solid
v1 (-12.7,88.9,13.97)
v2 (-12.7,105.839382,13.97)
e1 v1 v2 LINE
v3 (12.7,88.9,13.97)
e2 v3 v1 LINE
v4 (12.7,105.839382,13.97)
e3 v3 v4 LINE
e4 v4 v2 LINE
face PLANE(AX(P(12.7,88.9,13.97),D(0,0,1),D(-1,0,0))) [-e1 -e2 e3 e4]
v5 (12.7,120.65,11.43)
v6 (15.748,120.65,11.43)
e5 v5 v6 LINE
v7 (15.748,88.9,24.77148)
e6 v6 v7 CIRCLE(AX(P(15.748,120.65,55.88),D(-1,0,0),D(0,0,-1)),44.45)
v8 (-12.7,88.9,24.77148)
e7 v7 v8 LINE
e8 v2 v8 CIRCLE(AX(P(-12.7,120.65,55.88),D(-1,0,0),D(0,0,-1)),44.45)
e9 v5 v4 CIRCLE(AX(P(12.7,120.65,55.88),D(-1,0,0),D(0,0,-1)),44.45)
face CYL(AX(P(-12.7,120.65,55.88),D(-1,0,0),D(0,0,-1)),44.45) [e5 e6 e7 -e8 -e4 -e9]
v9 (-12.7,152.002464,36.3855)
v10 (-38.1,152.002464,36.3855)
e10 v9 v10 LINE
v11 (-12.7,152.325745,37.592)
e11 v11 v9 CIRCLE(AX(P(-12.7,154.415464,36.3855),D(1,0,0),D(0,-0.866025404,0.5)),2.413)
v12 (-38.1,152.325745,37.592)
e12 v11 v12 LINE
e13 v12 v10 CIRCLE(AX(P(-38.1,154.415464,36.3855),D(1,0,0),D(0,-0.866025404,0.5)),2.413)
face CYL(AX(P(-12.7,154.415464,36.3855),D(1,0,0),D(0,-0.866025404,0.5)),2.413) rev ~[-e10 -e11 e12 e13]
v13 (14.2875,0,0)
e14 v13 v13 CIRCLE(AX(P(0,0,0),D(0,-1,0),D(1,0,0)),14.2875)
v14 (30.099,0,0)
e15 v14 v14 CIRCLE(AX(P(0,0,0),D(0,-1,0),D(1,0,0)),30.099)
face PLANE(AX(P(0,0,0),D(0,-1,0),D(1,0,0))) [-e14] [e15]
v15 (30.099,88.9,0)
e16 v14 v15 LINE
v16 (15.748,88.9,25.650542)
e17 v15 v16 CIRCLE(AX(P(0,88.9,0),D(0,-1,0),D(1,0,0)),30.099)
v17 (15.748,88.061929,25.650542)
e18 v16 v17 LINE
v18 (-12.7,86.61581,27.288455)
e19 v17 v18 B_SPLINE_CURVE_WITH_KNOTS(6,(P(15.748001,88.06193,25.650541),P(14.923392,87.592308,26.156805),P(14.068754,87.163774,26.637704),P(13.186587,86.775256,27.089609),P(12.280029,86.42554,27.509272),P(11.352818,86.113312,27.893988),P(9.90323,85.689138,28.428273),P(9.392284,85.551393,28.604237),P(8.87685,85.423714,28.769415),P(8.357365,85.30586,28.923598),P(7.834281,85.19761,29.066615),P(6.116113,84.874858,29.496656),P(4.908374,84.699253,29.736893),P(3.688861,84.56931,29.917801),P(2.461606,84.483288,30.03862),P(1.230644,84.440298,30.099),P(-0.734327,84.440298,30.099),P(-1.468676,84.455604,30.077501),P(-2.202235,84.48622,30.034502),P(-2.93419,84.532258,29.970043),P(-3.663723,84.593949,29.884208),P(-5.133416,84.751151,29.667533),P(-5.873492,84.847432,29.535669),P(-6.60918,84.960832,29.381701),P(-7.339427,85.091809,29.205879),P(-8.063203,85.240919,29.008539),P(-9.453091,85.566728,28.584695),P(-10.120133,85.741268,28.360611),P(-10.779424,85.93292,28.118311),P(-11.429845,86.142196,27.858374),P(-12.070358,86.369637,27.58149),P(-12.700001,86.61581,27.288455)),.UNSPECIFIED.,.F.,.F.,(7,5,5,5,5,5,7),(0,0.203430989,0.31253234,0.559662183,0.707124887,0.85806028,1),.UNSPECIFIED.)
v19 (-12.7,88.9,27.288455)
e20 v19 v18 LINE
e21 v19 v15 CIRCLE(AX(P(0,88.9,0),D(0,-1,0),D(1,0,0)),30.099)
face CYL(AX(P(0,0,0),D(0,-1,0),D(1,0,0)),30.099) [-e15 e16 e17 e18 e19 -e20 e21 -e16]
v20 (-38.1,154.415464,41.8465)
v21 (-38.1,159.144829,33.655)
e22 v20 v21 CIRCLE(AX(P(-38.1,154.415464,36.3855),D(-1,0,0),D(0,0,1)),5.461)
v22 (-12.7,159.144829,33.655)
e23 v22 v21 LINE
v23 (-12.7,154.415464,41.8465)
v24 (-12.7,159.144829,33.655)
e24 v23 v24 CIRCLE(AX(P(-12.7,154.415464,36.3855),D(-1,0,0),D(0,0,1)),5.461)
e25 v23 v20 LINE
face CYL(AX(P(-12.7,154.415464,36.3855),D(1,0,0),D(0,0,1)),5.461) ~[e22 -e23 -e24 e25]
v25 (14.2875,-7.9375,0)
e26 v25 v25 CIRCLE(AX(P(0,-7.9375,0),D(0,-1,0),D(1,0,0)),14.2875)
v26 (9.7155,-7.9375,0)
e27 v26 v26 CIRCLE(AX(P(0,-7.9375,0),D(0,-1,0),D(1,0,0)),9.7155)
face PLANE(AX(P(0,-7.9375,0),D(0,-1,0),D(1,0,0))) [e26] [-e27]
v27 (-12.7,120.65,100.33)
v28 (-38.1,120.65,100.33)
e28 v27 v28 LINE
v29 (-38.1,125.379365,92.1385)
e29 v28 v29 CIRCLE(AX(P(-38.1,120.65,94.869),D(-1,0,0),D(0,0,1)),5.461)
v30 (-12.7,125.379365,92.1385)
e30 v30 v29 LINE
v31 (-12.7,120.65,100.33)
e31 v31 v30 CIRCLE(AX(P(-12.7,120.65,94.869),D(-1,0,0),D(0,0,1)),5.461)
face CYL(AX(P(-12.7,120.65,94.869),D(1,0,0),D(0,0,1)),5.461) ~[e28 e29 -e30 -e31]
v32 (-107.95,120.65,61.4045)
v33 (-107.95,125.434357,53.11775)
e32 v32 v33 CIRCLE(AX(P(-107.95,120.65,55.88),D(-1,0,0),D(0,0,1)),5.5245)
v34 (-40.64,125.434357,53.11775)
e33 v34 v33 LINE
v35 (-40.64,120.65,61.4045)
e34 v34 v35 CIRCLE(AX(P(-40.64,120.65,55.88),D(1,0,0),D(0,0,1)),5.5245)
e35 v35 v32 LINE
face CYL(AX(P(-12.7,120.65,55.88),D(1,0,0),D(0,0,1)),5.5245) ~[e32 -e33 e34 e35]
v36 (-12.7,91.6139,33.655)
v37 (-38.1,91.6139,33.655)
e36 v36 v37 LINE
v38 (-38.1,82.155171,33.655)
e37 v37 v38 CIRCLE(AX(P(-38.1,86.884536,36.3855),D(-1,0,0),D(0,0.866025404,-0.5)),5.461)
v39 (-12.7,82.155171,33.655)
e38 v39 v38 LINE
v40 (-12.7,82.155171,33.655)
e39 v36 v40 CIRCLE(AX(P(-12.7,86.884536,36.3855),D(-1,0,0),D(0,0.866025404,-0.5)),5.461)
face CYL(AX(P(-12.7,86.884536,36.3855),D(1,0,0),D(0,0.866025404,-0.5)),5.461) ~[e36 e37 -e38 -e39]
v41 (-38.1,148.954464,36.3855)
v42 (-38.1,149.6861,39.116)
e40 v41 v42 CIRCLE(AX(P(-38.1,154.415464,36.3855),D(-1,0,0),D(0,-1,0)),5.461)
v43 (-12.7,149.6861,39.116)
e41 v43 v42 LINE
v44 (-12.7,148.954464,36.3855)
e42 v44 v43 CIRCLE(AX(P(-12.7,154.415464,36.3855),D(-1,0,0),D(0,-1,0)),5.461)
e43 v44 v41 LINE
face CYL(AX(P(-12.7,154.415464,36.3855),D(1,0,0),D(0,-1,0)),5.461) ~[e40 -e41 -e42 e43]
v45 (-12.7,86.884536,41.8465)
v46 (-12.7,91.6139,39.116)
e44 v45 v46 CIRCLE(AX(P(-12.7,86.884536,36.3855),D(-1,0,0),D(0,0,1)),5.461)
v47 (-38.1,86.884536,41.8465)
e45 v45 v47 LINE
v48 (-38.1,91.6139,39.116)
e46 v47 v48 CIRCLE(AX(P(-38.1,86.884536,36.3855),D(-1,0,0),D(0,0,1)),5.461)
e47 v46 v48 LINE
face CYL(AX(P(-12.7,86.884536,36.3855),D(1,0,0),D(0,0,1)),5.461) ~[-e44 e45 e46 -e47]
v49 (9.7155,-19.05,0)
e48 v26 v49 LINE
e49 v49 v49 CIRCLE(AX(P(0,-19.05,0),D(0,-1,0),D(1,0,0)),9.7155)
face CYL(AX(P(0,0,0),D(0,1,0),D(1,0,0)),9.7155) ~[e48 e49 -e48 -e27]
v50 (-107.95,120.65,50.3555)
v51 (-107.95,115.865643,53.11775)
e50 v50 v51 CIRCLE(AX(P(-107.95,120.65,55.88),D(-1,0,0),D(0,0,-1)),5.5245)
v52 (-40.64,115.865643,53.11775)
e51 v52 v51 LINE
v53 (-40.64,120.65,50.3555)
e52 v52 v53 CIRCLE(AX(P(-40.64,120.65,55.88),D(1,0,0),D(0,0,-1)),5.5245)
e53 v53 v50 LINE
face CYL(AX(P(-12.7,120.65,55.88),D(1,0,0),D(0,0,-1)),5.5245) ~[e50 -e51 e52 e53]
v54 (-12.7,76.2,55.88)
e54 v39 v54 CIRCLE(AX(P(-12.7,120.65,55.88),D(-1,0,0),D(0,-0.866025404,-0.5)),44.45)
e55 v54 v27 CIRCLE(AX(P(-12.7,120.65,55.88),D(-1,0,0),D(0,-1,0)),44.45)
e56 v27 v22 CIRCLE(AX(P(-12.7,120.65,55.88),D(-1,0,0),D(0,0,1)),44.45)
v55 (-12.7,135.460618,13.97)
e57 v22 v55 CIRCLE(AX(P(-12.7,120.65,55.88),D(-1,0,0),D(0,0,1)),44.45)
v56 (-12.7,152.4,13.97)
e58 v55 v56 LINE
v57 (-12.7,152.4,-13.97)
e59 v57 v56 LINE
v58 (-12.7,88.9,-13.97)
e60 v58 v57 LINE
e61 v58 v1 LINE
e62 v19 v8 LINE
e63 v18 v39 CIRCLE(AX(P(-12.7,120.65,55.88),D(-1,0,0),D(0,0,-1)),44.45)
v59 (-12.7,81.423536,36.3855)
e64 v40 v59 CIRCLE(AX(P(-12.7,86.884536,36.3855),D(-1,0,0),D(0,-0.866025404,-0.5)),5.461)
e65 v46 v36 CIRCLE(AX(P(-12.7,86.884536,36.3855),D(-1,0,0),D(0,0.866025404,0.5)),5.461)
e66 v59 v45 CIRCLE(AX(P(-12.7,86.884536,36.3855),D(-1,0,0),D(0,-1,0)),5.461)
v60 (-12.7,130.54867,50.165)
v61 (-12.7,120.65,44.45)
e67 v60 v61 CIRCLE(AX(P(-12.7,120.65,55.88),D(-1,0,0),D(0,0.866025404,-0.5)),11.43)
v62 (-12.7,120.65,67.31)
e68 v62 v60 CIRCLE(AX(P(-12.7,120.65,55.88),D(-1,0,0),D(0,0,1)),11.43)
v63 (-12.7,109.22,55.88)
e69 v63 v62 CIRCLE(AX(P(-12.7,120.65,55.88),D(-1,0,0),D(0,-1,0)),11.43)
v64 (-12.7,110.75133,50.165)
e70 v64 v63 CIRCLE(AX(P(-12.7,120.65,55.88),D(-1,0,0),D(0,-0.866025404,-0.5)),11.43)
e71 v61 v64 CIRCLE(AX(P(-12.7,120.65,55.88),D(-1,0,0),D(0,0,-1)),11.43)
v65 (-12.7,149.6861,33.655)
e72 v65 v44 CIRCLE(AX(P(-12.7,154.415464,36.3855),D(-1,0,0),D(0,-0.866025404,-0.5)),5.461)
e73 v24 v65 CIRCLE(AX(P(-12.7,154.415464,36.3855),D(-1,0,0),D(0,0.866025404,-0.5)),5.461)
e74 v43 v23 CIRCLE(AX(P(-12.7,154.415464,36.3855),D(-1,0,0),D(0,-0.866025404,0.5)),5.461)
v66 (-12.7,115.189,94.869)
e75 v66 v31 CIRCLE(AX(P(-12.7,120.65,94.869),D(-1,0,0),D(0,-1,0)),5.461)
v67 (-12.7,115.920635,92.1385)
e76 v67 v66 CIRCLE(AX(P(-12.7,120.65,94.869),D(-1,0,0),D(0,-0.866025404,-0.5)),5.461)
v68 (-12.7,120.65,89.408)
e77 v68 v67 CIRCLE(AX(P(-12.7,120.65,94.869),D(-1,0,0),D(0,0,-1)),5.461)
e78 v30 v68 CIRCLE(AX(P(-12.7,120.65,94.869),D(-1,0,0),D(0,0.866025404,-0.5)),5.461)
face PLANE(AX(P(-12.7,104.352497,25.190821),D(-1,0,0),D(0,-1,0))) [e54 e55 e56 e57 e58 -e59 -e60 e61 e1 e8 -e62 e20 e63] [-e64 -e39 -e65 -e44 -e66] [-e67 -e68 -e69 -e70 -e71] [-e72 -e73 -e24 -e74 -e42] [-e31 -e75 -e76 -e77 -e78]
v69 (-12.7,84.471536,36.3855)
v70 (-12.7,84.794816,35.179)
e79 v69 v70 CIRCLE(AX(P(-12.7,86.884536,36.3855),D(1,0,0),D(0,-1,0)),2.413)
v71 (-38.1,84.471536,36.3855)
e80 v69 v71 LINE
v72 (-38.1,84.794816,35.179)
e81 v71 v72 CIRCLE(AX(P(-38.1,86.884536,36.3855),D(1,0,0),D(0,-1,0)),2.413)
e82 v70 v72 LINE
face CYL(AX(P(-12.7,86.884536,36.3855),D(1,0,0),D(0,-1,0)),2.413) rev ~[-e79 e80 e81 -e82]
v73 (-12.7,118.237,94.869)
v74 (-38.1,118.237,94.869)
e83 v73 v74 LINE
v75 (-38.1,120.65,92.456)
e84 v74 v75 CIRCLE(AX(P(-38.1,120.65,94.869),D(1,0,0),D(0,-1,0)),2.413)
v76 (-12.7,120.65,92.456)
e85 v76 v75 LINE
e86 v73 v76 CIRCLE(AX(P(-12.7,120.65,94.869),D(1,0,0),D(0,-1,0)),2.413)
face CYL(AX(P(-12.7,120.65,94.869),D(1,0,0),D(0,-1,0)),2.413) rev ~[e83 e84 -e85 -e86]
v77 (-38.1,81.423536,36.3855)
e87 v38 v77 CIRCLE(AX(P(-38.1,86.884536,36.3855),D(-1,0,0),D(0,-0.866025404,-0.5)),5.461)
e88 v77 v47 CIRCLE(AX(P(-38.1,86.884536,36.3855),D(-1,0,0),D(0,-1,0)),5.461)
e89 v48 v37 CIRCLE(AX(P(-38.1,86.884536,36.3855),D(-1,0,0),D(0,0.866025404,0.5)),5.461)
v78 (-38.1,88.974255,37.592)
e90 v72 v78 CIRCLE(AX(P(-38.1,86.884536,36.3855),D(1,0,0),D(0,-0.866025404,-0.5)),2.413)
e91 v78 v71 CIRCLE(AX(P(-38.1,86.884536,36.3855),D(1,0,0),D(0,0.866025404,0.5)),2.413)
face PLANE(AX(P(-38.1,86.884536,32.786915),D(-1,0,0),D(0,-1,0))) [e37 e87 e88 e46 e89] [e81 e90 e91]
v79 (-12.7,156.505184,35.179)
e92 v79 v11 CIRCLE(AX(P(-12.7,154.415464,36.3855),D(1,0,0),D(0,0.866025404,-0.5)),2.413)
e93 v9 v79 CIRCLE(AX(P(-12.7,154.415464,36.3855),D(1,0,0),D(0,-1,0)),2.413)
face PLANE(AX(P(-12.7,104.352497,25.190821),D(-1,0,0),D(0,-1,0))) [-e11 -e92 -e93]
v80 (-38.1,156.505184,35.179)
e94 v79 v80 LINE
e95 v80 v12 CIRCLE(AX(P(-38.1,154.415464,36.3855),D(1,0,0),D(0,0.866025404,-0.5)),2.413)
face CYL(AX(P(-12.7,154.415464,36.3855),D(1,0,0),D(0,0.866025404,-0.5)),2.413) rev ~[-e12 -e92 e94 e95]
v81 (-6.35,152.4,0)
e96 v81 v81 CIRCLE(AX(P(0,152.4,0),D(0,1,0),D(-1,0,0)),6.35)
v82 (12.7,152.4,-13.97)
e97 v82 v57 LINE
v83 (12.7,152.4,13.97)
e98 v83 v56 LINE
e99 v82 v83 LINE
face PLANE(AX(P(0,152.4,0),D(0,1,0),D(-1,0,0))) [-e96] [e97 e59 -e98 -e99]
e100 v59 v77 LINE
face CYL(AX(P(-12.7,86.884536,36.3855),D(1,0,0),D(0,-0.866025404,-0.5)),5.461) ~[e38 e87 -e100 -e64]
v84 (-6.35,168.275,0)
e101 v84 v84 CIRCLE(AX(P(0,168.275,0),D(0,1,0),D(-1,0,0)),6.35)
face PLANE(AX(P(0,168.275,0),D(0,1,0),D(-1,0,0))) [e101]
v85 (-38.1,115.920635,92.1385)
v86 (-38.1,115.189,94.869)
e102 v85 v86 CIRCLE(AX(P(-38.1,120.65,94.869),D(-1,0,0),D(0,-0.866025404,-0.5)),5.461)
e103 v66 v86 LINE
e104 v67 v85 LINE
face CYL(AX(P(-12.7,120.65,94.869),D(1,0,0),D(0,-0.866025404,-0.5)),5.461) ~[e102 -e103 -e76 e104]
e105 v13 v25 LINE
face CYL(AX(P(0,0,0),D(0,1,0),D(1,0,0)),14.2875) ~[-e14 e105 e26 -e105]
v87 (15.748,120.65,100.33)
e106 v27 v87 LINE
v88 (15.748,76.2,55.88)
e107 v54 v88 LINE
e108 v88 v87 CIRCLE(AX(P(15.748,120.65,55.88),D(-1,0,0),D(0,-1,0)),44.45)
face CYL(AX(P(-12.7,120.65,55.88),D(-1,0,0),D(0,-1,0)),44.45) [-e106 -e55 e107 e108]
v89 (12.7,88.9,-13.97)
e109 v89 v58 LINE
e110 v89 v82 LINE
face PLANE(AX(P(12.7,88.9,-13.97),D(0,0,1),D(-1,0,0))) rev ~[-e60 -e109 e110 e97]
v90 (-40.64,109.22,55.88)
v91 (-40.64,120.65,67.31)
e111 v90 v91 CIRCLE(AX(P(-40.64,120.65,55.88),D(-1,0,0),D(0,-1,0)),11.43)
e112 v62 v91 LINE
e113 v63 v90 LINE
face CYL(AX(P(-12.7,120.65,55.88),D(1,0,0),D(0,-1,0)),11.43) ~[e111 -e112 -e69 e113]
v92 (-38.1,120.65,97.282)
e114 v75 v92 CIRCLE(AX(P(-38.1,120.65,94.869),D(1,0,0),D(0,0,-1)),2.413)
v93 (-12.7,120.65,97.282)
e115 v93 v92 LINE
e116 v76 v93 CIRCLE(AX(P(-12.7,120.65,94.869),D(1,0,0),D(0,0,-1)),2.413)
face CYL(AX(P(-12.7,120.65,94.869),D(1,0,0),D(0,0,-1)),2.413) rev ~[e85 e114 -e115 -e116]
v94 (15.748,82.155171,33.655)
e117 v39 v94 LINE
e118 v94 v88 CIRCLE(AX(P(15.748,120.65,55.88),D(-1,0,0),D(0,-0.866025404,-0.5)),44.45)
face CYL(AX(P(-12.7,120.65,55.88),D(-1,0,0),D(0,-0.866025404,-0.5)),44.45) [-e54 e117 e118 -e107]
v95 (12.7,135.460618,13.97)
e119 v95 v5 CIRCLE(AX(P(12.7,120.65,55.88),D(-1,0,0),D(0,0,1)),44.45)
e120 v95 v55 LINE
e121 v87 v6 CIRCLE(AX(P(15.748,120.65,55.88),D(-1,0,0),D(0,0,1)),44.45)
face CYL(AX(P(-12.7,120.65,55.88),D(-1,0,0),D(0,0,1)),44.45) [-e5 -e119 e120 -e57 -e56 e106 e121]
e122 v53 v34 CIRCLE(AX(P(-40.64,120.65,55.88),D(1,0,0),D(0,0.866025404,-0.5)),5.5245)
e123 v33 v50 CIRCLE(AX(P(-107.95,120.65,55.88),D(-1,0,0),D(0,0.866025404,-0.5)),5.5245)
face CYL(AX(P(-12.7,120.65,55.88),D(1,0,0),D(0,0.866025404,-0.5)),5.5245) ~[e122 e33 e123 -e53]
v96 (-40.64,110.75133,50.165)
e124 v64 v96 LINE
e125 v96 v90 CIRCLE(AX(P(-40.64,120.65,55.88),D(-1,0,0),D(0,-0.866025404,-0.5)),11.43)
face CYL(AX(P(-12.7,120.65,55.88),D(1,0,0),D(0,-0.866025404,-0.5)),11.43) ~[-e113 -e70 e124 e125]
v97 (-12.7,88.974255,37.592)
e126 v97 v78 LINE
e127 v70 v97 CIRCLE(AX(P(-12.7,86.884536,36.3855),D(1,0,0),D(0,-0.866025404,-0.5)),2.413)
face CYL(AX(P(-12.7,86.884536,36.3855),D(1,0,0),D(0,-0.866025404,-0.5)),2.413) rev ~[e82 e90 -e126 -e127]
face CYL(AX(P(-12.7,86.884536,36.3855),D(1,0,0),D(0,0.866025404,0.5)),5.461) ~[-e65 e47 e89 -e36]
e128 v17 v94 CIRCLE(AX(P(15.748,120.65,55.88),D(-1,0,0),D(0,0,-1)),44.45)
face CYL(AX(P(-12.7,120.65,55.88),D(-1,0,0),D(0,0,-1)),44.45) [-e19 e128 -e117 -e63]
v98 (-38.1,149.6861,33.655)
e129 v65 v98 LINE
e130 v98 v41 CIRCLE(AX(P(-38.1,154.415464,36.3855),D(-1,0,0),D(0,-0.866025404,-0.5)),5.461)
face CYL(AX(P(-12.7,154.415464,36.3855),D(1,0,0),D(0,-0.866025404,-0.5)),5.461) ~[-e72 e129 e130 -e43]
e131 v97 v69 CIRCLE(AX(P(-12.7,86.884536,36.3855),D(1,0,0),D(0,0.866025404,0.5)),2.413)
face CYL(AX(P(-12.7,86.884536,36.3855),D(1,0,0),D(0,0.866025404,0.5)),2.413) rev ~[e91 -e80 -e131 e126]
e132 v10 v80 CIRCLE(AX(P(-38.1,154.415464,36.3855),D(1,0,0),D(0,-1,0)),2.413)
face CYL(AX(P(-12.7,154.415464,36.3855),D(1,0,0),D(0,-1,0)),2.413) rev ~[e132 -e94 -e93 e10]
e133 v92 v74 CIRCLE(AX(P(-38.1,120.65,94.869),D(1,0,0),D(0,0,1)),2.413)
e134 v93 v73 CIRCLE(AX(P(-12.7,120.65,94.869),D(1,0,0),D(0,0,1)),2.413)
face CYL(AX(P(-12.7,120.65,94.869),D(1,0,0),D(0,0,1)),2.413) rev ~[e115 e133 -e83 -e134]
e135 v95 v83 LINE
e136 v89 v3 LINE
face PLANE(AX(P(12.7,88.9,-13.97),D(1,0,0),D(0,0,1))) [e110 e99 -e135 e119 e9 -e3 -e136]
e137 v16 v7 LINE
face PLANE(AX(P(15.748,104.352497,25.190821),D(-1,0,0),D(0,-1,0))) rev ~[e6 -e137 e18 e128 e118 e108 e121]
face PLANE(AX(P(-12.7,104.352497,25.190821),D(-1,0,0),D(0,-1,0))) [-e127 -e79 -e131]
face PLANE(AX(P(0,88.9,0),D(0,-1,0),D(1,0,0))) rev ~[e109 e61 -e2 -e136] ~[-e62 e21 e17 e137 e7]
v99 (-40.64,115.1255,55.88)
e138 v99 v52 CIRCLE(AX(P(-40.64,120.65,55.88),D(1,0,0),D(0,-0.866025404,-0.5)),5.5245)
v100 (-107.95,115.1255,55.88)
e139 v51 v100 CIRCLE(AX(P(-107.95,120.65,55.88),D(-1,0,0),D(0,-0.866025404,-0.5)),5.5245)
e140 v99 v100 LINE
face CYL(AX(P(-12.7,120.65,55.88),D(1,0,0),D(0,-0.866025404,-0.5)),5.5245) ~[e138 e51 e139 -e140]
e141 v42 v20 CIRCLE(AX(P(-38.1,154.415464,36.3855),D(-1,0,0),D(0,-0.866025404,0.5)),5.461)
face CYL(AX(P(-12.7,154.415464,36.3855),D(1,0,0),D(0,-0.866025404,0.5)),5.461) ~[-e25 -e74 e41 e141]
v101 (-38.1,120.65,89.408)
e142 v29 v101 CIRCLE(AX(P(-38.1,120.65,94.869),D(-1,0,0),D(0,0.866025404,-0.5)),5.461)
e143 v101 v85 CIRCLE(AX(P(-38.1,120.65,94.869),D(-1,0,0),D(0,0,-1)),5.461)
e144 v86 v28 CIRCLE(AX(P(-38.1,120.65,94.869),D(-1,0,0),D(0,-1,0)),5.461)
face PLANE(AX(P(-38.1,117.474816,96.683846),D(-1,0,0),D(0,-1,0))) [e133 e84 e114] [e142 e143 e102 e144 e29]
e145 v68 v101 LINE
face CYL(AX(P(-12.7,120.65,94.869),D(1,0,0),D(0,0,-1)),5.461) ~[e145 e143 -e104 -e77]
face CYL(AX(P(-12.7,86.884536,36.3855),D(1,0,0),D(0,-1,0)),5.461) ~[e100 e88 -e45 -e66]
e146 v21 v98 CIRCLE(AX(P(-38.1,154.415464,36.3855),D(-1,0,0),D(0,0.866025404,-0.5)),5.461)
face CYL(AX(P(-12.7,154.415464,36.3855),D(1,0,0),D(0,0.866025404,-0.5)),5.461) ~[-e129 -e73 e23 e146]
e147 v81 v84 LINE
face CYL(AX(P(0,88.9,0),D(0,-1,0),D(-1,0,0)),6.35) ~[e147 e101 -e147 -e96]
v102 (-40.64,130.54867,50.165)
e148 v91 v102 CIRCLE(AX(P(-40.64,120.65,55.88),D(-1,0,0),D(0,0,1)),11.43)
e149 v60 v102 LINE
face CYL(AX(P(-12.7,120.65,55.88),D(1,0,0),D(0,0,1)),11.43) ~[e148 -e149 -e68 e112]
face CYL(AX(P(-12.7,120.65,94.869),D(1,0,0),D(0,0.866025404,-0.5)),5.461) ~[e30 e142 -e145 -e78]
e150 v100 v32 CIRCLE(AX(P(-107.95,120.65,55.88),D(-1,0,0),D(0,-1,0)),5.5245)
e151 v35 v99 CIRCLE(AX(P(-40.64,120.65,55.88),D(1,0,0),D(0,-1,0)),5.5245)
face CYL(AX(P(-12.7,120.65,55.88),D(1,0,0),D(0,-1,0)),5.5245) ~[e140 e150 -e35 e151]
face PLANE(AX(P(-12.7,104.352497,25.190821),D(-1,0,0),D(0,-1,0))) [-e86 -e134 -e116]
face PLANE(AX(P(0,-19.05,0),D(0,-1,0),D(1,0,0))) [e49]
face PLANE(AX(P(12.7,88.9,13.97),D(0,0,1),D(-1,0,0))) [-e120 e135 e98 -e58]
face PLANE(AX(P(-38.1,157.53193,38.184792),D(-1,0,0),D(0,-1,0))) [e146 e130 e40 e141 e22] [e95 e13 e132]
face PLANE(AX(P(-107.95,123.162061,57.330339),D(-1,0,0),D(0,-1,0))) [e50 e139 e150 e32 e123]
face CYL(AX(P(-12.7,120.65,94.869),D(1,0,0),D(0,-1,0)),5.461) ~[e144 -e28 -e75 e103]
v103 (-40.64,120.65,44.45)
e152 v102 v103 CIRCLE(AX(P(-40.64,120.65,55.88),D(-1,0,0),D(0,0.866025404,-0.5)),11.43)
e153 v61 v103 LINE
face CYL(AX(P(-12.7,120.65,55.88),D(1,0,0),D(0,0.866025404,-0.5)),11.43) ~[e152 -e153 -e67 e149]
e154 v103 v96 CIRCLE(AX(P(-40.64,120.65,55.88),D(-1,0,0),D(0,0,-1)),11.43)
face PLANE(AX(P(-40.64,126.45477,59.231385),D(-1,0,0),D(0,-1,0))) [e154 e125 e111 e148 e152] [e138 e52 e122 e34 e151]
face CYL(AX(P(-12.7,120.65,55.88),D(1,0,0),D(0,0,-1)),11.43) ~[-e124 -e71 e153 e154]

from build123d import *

# Parameters (mm, degrees)
F0_R      = 30.099
F0_R_2    = 14.2875
F0_R_3    = 9.7155
F1_DEPTH  = 88.9
F2_DEPTH  = 7.9375
F3_DEPTH  = 19.05
F4_W      = 25.4
F4_H      = 27.94
F4_R      = 6.35
F5_DEPTH  = 63.5
F6_DEPTH  = 79.375
F8_DEPTH  = 28.448
F9_DEPTH  = 27.94
F10_DEPTH = 95.25
F11_DEPTH = 25.4


# Not quite as in the source:
# - a length typed as a fraction of an inch, garbled in the dataset ("3 / 203.2 mm" for 3/8 in), is restored


with BuildPart() as f1:
    # F0 (on Front) → F1 (new body)
    with BuildSketch(Plane.XZ):
        Circle(F0_R)
        Circle(F0_R_2, mode=Mode.SUBTRACT)
        Circle(F0_R_2)
        Circle(F0_R_3, mode=Mode.SUBTRACT)
        Circle(F0_R_3)
    extrude(amount=-F1_DEPTH)

    # F0 (on Front) → F2 (join)
    with BuildSketch(Plane.XZ):
        Circle(F0_R_2)
        Circle(F0_R_3, mode=Mode.SUBTRACT)
    extrude(amount=F2_DEPTH)

    # F0 (on Front) → F3 (join)
    with BuildSketch(Plane.XZ):
        Circle(F0_R_3)
    extrude(amount=F3_DEPTH)

    # F4 (on face) → F5 (join)
    with BuildSketch(Plane(origin=(0, 88.9, 0), x_dir=(-1, 0, 0), z_dir=(0, 1, 0))):
        Rectangle(F4_W, F4_H)
        Circle(F4_R, mode=Mode.SUBTRACT)
    extrude(amount=F5_DEPTH)

    # F4 (on face) → F6 (join)
    with BuildSketch(Plane(origin=(0, 88.9, 0), x_dir=(-1, 0, 0), z_dir=(0, 1, 0))):
        Circle(F4_R)
    extrude(amount=F6_DEPTH)

    # F7 (on face) → F8 (join)
    with BuildSketch(Plane(origin=(-12.7, 0, 0), x_dir=(0, -1, 0), z_dir=(-1, 0, 0))):
        with BuildLine():
            Line((-120.65, 33.655), (-120.65, 13.97))
            Line((-120.65, 13.97), (-120.65, 11.43))
            ThreePointArc((-120.65, 11.43), (-98.425, 17.3851708018), (-82.1551708018, 33.655))
            ThreePointArc((-82.1551708018, 33.655), (-86.8845355318, 30.9245), (-91.6139002619, 33.655))
            Line((-91.6139002619, 33.655), (-120.65, 33.655))
        make_face()
        with BuildLine():
            Line((-120.65, 11.43), (-120.65, 13.97))
            Line((-120.65, 13.97), (-120.65, 33.655))
            Line((-120.65, 33.655), (-149.6860997381, 33.655))
            ThreePointArc((-149.6860997381, 33.655), (-154.4154644682, 30.9245), (-159.1448291982, 33.655))
            ThreePointArc((-159.1448291982, 33.655), (-142.875, 17.3851708018), (-120.65, 11.43))
        make_face()
        with BuildLine():
            Line((-156.5051837675, 35.179), (-159.1448291982, 33.655))
            Line((-159.1448291982, 33.655), (-149.6860997381, 33.655))
            ThreePointArc((-149.6860997381, 33.655), (-149.1405435308, 34.9720891947), (-148.9544644682, 36.3855))
            ThreePointArc((-148.9544644682, 36.3855), (-149.1405435308, 37.7989108053), (-149.6860997381, 39.116))
            Line((-149.6860997381, 39.116), (-152.3257451688, 37.592))
            ThreePointArc((-152.3257451688, 37.592), (-152.0846854493, 37.0100303558), (-152.0024644682, 36.3855))
            ThreePointArc((-152.0024644682, 36.3855), (-153.7909341123, 34.0547209812), (-156.5051837675, 35.179))
        make_face()
        with BuildLine():
            ThreePointArc((-154.4154644682, 41.8465), (-159.1448291982, 39.116), (-159.1448291982, 33.655))
            Line((-159.1448291982, 33.655), (-154.4154644682, 41.8465))
        make_face()
        with BuildLine():
            Line((-154.4154644682, 41.8465), (-159.1448291982, 33.655))
            Line((-159.1448291982, 33.655), (-156.5051837675, 35.179))
            ThreePointArc((-156.5051837675, 35.179), (-155.6219644682, 38.4752192993), (-152.3257451688, 37.592))
            Line((-152.3257451688, 37.592), (-149.6860997381, 39.116))
            ThreePointArc((-149.6860997381, 39.116), (-151.6849644682, 41.1148647301), (-154.4154644682, 41.8465))
        make_face()
        with BuildLine():
            ThreePointArc((-120.65, 100.33), (-159.1448291982, 78.105), (-159.1448291982, 33.655))
            ThreePointArc((-159.1448291982, 33.655), (-159.1448291982, 39.116), (-154.4154644682, 41.8465))
            Line((-154.4154644682, 41.8465), (-125.3793647301, 92.1385))
            ThreePointArc((-125.3793647301, 92.1385), (-125.3793647301, 97.5995), (-120.65, 100.33))
        make_face()
        with BuildLine():
            Line((-149.6860997381, 33.655), (-159.1448291982, 33.655))
            ThreePointArc((-159.1448291982, 33.655), (-154.4154644682, 30.9245), (-149.6860997381, 33.655))
        make_face()
        with BuildLine():
            ThreePointArc((-81.4235355318, 36.3855), (-81.6096145945, 34.9720891947), (-82.1551708018, 33.655))
            ThreePointArc((-82.1551708018, 33.655), (-77.7145970215, 44.3754934452), (-76.2, 55.88))
            ThreePointArc((-76.2, 55.88), (-89.2191035763, 87.3108964237), (-120.65, 100.33))
            ThreePointArc((-120.65, 100.33), (-116.7884898679, 98.7305101321), (-115.189, 94.869))
            ThreePointArc((-115.189, 94.869), (-115.3750790626, 93.4555891947), (-115.9206352699, 92.1385))
            Line((-115.9206352699, 92.1385), (-86.8845355318, 41.8465))
            ThreePointArc((-86.8845355318, 41.8465), (-83.0230253998, 40.2470101321), (-81.4235355318, 36.3855))
        make_face()
        with BuildLine():
            Line((-84.7948162325, 35.179), (-82.1551708018, 33.655))
            Line((-82.1551708018, 33.655), (-86.8845355318, 41.8465))
            ThreePointArc((-86.8845355318, 41.8465), (-89.6150355318, 41.1148647301), (-91.6139002619, 39.116))
            Line((-91.6139002619, 39.116), (-88.9742548312, 37.592))
            ThreePointArc((-88.9742548312, 37.592), (-86.260005176, 38.7162790188), (-84.4715355318, 36.3855))
            ThreePointArc((-84.4715355318, 36.3855), (-84.553756513, 35.7609696442), (-84.7948162325, 35.179))
        make_face()
        with BuildLine():
            ThreePointArc((-91.6139002619, 33.655), (-86.8845355318, 30.9245), (-82.1551708018, 33.655))
            Line((-82.1551708018, 33.655), (-91.6139002619, 33.655))
        make_face()
        with BuildLine():
            Line((-91.6139002619, 33.655), (-82.1551708018, 33.655))
            Line((-82.1551708018, 33.655), (-84.7948162325, 35.179))
            ThreePointArc((-84.7948162325, 35.179), (-88.0910355318, 34.2957807007), (-88.9742548312, 37.592))
            Line((-88.9742548312, 37.592), (-91.6139002619, 39.116))
            ThreePointArc((-91.6139002619, 39.116), (-92.3455355318, 36.3855), (-91.6139002619, 33.655))
        make_face()
        with BuildLine():
            Line((-86.8845355318, 41.8465), (-82.1551708018, 33.655))
            ThreePointArc((-82.1551708018, 33.655), (-81.6096145945, 34.9720891947), (-81.4235355318, 36.3855))
            ThreePointArc((-81.4235355318, 36.3855), (-83.0230253998, 40.2470101321), (-86.8845355318, 41.8465))
        make_face()
        with BuildLine():
            ThreePointArc((-115.189, 94.869), (-116.7884898679, 98.7305101321), (-120.65, 100.33))
            Line((-120.65, 100.33), (-115.9206352699, 92.1385))
            ThreePointArc((-115.9206352699, 92.1385), (-115.3750790626, 93.4555891947), (-115.189, 94.869))
        make_face()
        with BuildLine():
            Line((-120.65, 97.282), (-120.65, 100.33))
            Line((-120.65, 100.33), (-125.3793647301, 92.1385))
            ThreePointArc((-125.3793647301, 92.1385), (-123.3805, 90.1396352699), (-120.65, 89.408))
            Line((-120.65, 89.408), (-120.65, 92.456))
            ThreePointArc((-120.65, 92.456), (-123.063, 94.869), (-120.65, 97.282))
        make_face()
        with BuildLine():
            Line((-115.9206352699, 92.1385), (-120.65, 100.33))
            Line((-120.65, 100.33), (-120.65, 97.282))
            ThreePointArc((-120.65, 97.282), (-118.943751337, 96.575248663), (-118.237, 94.869))
            ThreePointArc((-118.237, 94.869), (-118.943751337, 93.162751337), (-120.65, 92.456))
            Line((-120.65, 92.456), (-120.65, 89.408))
            ThreePointArc((-120.65, 89.408), (-117.9195, 90.1396352699), (-115.9206352699, 92.1385))
        make_face()
        with BuildLine():
            Line((-125.3793647301, 92.1385), (-120.65, 100.33))
            ThreePointArc((-120.65, 100.33), (-125.3793647301, 97.5995), (-125.3793647301, 92.1385))
        make_face()
        with BuildLine():
            ThreePointArc((-120.65, 67.31), (-130.5486703653, 61.595), (-130.5486703653, 50.165))
            Line((-130.5486703653, 50.165), (-125.4343573432, 53.11775))
            ThreePointArc((-125.4343573432, 53.11775), (-125.4343573432, 58.64225), (-120.65, 61.4045))
            Line((-120.65, 61.4045), (-120.65, 67.31))
        make_face()
        with BuildLine():
            ThreePointArc((-130.5486703653, 50.165), (-126.365, 45.9813296347), (-120.65, 44.45))
            Line((-120.65, 44.45), (-120.65, 50.3555))
            ThreePointArc((-120.65, 50.3555), (-123.41225, 51.0956426568), (-125.4343573432, 53.11775))
            Line((-125.4343573432, 53.11775), (-130.5486703653, 50.165))
        make_face()
        with BuildLine():
            Line((-120.65, 50.3555), (-120.65, 44.45))
            ThreePointArc((-120.65, 44.45), (-114.935, 45.9813296347), (-110.7513296347, 50.165))
            Line((-110.7513296347, 50.165), (-115.8656426568, 53.11775))
            ThreePointArc((-115.8656426568, 53.11775), (-117.88775, 51.0956426568), (-120.65, 50.3555))
        make_face()
        with BuildLine():
            Line((-115.8656426568, 53.11775), (-110.7513296347, 50.165))
            ThreePointArc((-110.7513296347, 50.165), (-109.6094678055, 52.9216983145), (-109.22, 55.88))
            ThreePointArc((-109.22, 55.88), (-112.567769491, 63.962230509), (-120.65, 67.31))
            Line((-120.65, 67.31), (-120.65, 61.4045))
            ThreePointArc((-120.65, 61.4045), (-116.7435885873, 59.7864114127), (-115.1255, 55.88))
            ThreePointArc((-115.1255, 55.88), (-115.3137427727, 54.4501541853), (-115.8656426568, 53.11775))
        make_face()
        with BuildLine():
            Line((-125.4343573432, 53.11775), (-120.65, 55.88))
            Line((-120.65, 55.88), (-120.65, 61.4045))
            ThreePointArc((-120.65, 61.4045), (-125.4343573432, 58.64225), (-125.4343573432, 53.11775))
        make_face()
        with BuildLine():
            ThreePointArc((-125.4343573432, 53.11775), (-123.41225, 51.0956426568), (-120.65, 50.3555))
            Line((-120.65, 50.3555), (-120.65, 55.88))
            Line((-120.65, 55.88), (-125.4343573432, 53.11775))
        make_face()
        with BuildLine():
            Line((-120.65, 55.88), (-120.65, 50.3555))
            ThreePointArc((-120.65, 50.3555), (-117.88775, 51.0956426568), (-115.8656426568, 53.11775))
            Line((-115.8656426568, 53.11775), (-120.65, 55.88))
        make_face()
        with BuildLine():
            Line((-120.65, 61.4045), (-120.65, 55.88))
            Line((-120.65, 55.88), (-115.8656426568, 53.11775))
            ThreePointArc((-115.8656426568, 53.11775), (-115.3137427727, 54.4501541853), (-115.1255, 55.88))
            ThreePointArc((-115.1255, 55.88), (-116.7435885873, 59.7864114127), (-120.65, 61.4045))
        make_face()
        with BuildLine():
            ThreePointArc((-109.22, 55.88), (-109.6094678055, 52.9216983145), (-110.7513296347, 50.165))
            Line((-110.7513296347, 50.165), (-91.6139002619, 39.116))
            ThreePointArc((-91.6139002619, 39.116), (-89.6150355318, 41.1148647301), (-86.8845355318, 41.8465))
            Line((-86.8845355318, 41.8465), (-115.9206352699, 92.1385))
            ThreePointArc((-115.9206352699, 92.1385), (-117.9195, 90.1396352699), (-120.65, 89.408))
            Line((-120.65, 89.408), (-120.65, 67.31))
            ThreePointArc((-120.65, 67.31), (-112.567769491, 63.962230509), (-109.22, 55.88))
        make_face()
        with BuildLine():
            Line((-149.6860997381, 39.116), (-130.5486703653, 50.165))
            ThreePointArc((-130.5486703653, 50.165), (-130.5486703653, 61.595), (-120.65, 67.31))
            Line((-120.65, 67.31), (-120.65, 89.408))
            ThreePointArc((-120.65, 89.408), (-123.3805, 90.1396352699), (-125.3793647301, 92.1385))
            Line((-125.3793647301, 92.1385), (-154.4154644682, 41.8465))
            ThreePointArc((-154.4154644682, 41.8465), (-151.6849644682, 41.1148647301), (-149.6860997381, 39.116))
        make_face()
        with BuildLine():
            Line((-149.6860997381, 33.655), (-120.65, 33.655))
            Line((-120.65, 33.655), (-120.65, 44.45))
            ThreePointArc((-120.65, 44.45), (-126.365, 45.9813296347), (-130.5486703653, 50.165))
            Line((-130.5486703653, 50.165), (-149.6860997381, 39.116))
            ThreePointArc((-149.6860997381, 39.116), (-149.1405435308, 37.7989108053), (-148.9544644682, 36.3855))
            ThreePointArc((-148.9544644682, 36.3855), (-149.1405435308, 34.9720891947), (-149.6860997381, 33.655))
        make_face()
        with BuildLine():
            Line((-120.65, 44.45), (-120.65, 33.655))
            Line((-120.65, 33.655), (-91.6139002619, 33.655))
            ThreePointArc((-91.6139002619, 33.655), (-92.3455355318, 36.3855), (-91.6139002619, 39.116))
            Line((-91.6139002619, 39.116), (-110.7513296347, 50.165))
            ThreePointArc((-110.7513296347, 50.165), (-114.935, 45.9813296347), (-120.65, 44.45))
        make_face()
        with BuildLine():
            ThreePointArc((-152.3257451688, 37.592), (-155.6219644682, 38.4752192993), (-156.5051837675, 35.179))
            Line((-156.5051837675, 35.179), (-154.4154644682, 36.3855))
            Line((-154.4154644682, 36.3855), (-152.3257451688, 37.592))
        make_face()
        with BuildLine():
            Line((-154.4154644682, 36.3855), (-156.5051837675, 35.179))
            ThreePointArc((-156.5051837675, 35.179), (-153.7909341123, 34.0547209812), (-152.0024644682, 36.3855))
            ThreePointArc((-152.0024644682, 36.3855), (-152.0846854493, 37.0100303558), (-152.3257451688, 37.592))
            Line((-152.3257451688, 37.592), (-154.4154644682, 36.3855))
        make_face()
        with BuildLine():
            Line((-86.8845355318, 36.3855), (-84.7948162325, 35.179))
            ThreePointArc((-84.7948162325, 35.179), (-84.553756513, 35.7609696442), (-84.4715355318, 36.3855))
            ThreePointArc((-84.4715355318, 36.3855), (-86.260005176, 38.7162790188), (-88.9742548312, 37.592))
            Line((-88.9742548312, 37.592), (-86.8845355318, 36.3855))
        make_face()
        with BuildLine():
            ThreePointArc((-88.9742548312, 37.592), (-88.0910355318, 34.2957807007), (-84.7948162325, 35.179))
            Line((-84.7948162325, 35.179), (-86.8845355318, 36.3855))
            Line((-86.8845355318, 36.3855), (-88.9742548312, 37.592))
        make_face()
        with BuildLine():
            Line((-120.65, 94.869), (-120.65, 97.282))
            ThreePointArc((-120.65, 97.282), (-123.063, 94.869), (-120.65, 92.456))
            Line((-120.65, 92.456), (-120.65, 94.869))
        make_face()
        with BuildLine():
            ThreePointArc((-118.237, 94.869), (-118.943751337, 96.575248663), (-120.65, 97.282))
            Line((-120.65, 97.282), (-120.65, 94.869))
            Line((-120.65, 94.869), (-120.65, 92.456))
            ThreePointArc((-120.65, 92.456), (-118.943751337, 93.162751337), (-118.237, 94.869))
        make_face()
    extrude(amount=-F8_DEPTH)

    # F7 (on face) → F9 (join)
    with BuildSketch(Plane(origin=(-12.7, 0, 0), x_dir=(0, -1, 0), z_dir=(-1, 0, 0))):
        with BuildLine():
            ThreePointArc((-120.65, 67.31), (-130.5486703653, 61.595), (-130.5486703653, 50.165))
            Line((-130.5486703653, 50.165), (-125.4343573432, 53.11775))
            ThreePointArc((-125.4343573432, 53.11775), (-125.4343573432, 58.64225), (-120.65, 61.4045))
            Line((-120.65, 61.4045), (-120.65, 67.31))
        make_face()
        with BuildLine():
            ThreePointArc((-130.5486703653, 50.165), (-126.365, 45.9813296347), (-120.65, 44.45))
            Line((-120.65, 44.45), (-120.65, 50.3555))
            ThreePointArc((-120.65, 50.3555), (-123.41225, 51.0956426568), (-125.4343573432, 53.11775))
            Line((-125.4343573432, 53.11775), (-130.5486703653, 50.165))
        make_face()
        with BuildLine():
            Line((-120.65, 50.3555), (-120.65, 44.45))
            ThreePointArc((-120.65, 44.45), (-114.935, 45.9813296347), (-110.7513296347, 50.165))
            Line((-110.7513296347, 50.165), (-115.8656426568, 53.11775))
            ThreePointArc((-115.8656426568, 53.11775), (-117.88775, 51.0956426568), (-120.65, 50.3555))
        make_face()
        with BuildLine():
            Line((-115.8656426568, 53.11775), (-110.7513296347, 50.165))
            ThreePointArc((-110.7513296347, 50.165), (-109.6094678055, 52.9216983145), (-109.22, 55.88))
            ThreePointArc((-109.22, 55.88), (-112.567769491, 63.962230509), (-120.65, 67.31))
            Line((-120.65, 67.31), (-120.65, 61.4045))
            ThreePointArc((-120.65, 61.4045), (-116.7435885873, 59.7864114127), (-115.1255, 55.88))
            ThreePointArc((-115.1255, 55.88), (-115.3137427727, 54.4501541853), (-115.8656426568, 53.11775))
        make_face()
        with BuildLine():
            Line((-125.4343573432, 53.11775), (-120.65, 55.88))
            Line((-120.65, 55.88), (-120.65, 61.4045))
            ThreePointArc((-120.65, 61.4045), (-125.4343573432, 58.64225), (-125.4343573432, 53.11775))
        make_face()
        with BuildLine():
            ThreePointArc((-125.4343573432, 53.11775), (-123.41225, 51.0956426568), (-120.65, 50.3555))
            Line((-120.65, 50.3555), (-120.65, 55.88))
            Line((-120.65, 55.88), (-125.4343573432, 53.11775))
        make_face()
        with BuildLine():
            Line((-120.65, 55.88), (-120.65, 50.3555))
            ThreePointArc((-120.65, 50.3555), (-117.88775, 51.0956426568), (-115.8656426568, 53.11775))
            Line((-115.8656426568, 53.11775), (-120.65, 55.88))
        make_face()
        with BuildLine():
            Line((-120.65, 61.4045), (-120.65, 55.88))
            Line((-120.65, 55.88), (-115.8656426568, 53.11775))
            ThreePointArc((-115.8656426568, 53.11775), (-115.3137427727, 54.4501541853), (-115.1255, 55.88))
            ThreePointArc((-115.1255, 55.88), (-116.7435885873, 59.7864114127), (-120.65, 61.4045))
        make_face()
    extrude(amount=F9_DEPTH)

    # F7 (on face) → F10 (join)
    with BuildSketch(Plane(origin=(-12.7, 0, 0), x_dir=(0, -1, 0), z_dir=(-1, 0, 0))):
        with BuildLine():
            Line((-125.4343573432, 53.11775), (-120.65, 55.88))
            Line((-120.65, 55.88), (-120.65, 61.4045))
            ThreePointArc((-120.65, 61.4045), (-125.4343573432, 58.64225), (-125.4343573432, 53.11775))
        make_face()
        with BuildLine():
            ThreePointArc((-125.4343573432, 53.11775), (-123.41225, 51.0956426568), (-120.65, 50.3555))
            Line((-120.65, 50.3555), (-120.65, 55.88))
            Line((-120.65, 55.88), (-125.4343573432, 53.11775))
        make_face()
        with BuildLine():
            Line((-120.65, 55.88), (-120.65, 50.3555))
            ThreePointArc((-120.65, 50.3555), (-117.88775, 51.0956426568), (-115.8656426568, 53.11775))
            Line((-115.8656426568, 53.11775), (-120.65, 55.88))
        make_face()
        with BuildLine():
            Line((-120.65, 61.4045), (-120.65, 55.88))
            Line((-120.65, 55.88), (-115.8656426568, 53.11775))
            ThreePointArc((-115.8656426568, 53.11775), (-115.3137427727, 54.4501541853), (-115.1255, 55.88))
            ThreePointArc((-115.1255, 55.88), (-116.7435885873, 59.7864114127), (-120.65, 61.4045))
        make_face()
    extrude(amount=F10_DEPTH)

    # F7 (on face) → F11 (join)
    with BuildSketch(Plane(origin=(-12.7, 0, 0), x_dir=(0, -1, 0), z_dir=(-1, 0, 0))):
        with BuildLine():
            ThreePointArc((-154.4154644682, 41.8465), (-159.1448291982, 39.116), (-159.1448291982, 33.655))
            Line((-159.1448291982, 33.655), (-154.4154644682, 41.8465))
        make_face()
        with BuildLine():
            ThreePointArc((-159.1448291982, 33.655), (-154.4154644682, 30.9245), (-149.6860997381, 33.655))
            Line((-149.6860997381, 33.655), (-159.1448291982, 33.655))
        make_face()
        with BuildLine():
            Line((-82.1551708018, 33.655), (-91.6139002619, 33.655))
            ThreePointArc((-91.6139002619, 33.655), (-86.8845355318, 30.9245), (-82.1551708018, 33.655))
        make_face()
        with BuildLine():
            Line((-86.8845355318, 41.8465), (-82.1551708018, 33.655))
            ThreePointArc((-82.1551708018, 33.655), (-81.6096145945, 34.9720891947), (-81.4235355318, 36.3855))
            ThreePointArc((-81.4235355318, 36.3855), (-83.0230253998, 40.2470101321), (-86.8845355318, 41.8465))
        make_face()
        with BuildLine():
            ThreePointArc((-115.189, 94.869), (-116.7884898679, 98.7305101321), (-120.65, 100.33))
            Line((-120.65, 100.33), (-115.9206352699, 92.1385))
            ThreePointArc((-115.9206352699, 92.1385), (-115.3750790626, 93.4555891947), (-115.189, 94.869))
        make_face()
        with BuildLine():
            Line((-125.3793647301, 92.1385), (-120.65, 100.33))
            ThreePointArc((-120.65, 100.33), (-125.3793647301, 97.5995), (-125.3793647301, 92.1385))
        make_face()
        with BuildLine():
            Line((-84.7948162325, 35.179), (-82.1551708018, 33.655))
            Line((-82.1551708018, 33.655), (-86.8845355318, 41.8465))
            ThreePointArc((-86.8845355318, 41.8465), (-89.6150355318, 41.1148647301), (-91.6139002619, 39.116))
            Line((-91.6139002619, 39.116), (-88.9742548312, 37.592))
            ThreePointArc((-88.9742548312, 37.592), (-86.260005176, 38.7162790188), (-84.4715355318, 36.3855))
            ThreePointArc((-84.4715355318, 36.3855), (-84.553756513, 35.7609696442), (-84.7948162325, 35.179))
        make_face()
        with BuildLine():
            ThreePointArc((-91.6139002619, 39.116), (-92.3455355318, 36.3855), (-91.6139002619, 33.655))
            Line((-91.6139002619, 33.655), (-82.1551708018, 33.655))
            Line((-82.1551708018, 33.655), (-84.7948162325, 35.179))
            ThreePointArc((-84.7948162325, 35.179), (-88.0910355318, 34.2957807007), (-88.9742548312, 37.592))
            Line((-88.9742548312, 37.592), (-91.6139002619, 39.116))
        make_face()
        with BuildLine():
            Line((-159.1448291982, 33.655), (-149.6860997381, 33.655))
            ThreePointArc((-149.6860997381, 33.655), (-149.1405435308, 34.9720891947), (-148.9544644682, 36.3855))
            ThreePointArc((-148.9544644682, 36.3855), (-149.1405435308, 37.7989108053), (-149.6860997381, 39.116))
            Line((-149.6860997381, 39.116), (-152.3257451688, 37.592))
            ThreePointArc((-152.3257451688, 37.592), (-152.0846854493, 37.0100303558), (-152.0024644682, 36.3855))
            ThreePointArc((-152.0024644682, 36.3855), (-153.7909341123, 34.0547209812), (-156.5051837675, 35.179))
            Line((-156.5051837675, 35.179), (-159.1448291982, 33.655))
        make_face()
        with BuildLine():
            Line((-154.4154644682, 41.8465), (-159.1448291982, 33.655))
            Line((-159.1448291982, 33.655), (-156.5051837675, 35.179))
            ThreePointArc((-156.5051837675, 35.179), (-155.6219644682, 38.4752192993), (-152.3257451688, 37.592))
            Line((-152.3257451688, 37.592), (-149.6860997381, 39.116))
            ThreePointArc((-149.6860997381, 39.116), (-151.6849644682, 41.1148647301), (-154.4154644682, 41.8465))
        make_face()
        with BuildLine():
            Line((-115.9206352699, 92.1385), (-120.65, 100.33))
            Line((-120.65, 100.33), (-120.65, 97.282))
            ThreePointArc((-120.65, 97.282), (-118.943751337, 96.575248663), (-118.237, 94.869))
            ThreePointArc((-118.237, 94.869), (-118.943751337, 93.162751337), (-120.65, 92.456))
            Line((-120.65, 92.456), (-120.65, 89.408))
            ThreePointArc((-120.65, 89.408), (-117.9195, 90.1396352699), (-115.9206352699, 92.1385))
        make_face()
        with BuildLine():
            Line((-120.65, 97.282), (-120.65, 100.33))
            Line((-120.65, 100.33), (-125.3793647301, 92.1385))
            ThreePointArc((-125.3793647301, 92.1385), (-123.3805, 90.1396352699), (-120.65, 89.408))
            Line((-120.65, 89.408), (-120.65, 92.456))
            ThreePointArc((-120.65, 92.456), (-123.063, 94.869), (-120.65, 97.282))
        make_face()
    extrude(amount=F11_DEPTH)


solid = f1.part
